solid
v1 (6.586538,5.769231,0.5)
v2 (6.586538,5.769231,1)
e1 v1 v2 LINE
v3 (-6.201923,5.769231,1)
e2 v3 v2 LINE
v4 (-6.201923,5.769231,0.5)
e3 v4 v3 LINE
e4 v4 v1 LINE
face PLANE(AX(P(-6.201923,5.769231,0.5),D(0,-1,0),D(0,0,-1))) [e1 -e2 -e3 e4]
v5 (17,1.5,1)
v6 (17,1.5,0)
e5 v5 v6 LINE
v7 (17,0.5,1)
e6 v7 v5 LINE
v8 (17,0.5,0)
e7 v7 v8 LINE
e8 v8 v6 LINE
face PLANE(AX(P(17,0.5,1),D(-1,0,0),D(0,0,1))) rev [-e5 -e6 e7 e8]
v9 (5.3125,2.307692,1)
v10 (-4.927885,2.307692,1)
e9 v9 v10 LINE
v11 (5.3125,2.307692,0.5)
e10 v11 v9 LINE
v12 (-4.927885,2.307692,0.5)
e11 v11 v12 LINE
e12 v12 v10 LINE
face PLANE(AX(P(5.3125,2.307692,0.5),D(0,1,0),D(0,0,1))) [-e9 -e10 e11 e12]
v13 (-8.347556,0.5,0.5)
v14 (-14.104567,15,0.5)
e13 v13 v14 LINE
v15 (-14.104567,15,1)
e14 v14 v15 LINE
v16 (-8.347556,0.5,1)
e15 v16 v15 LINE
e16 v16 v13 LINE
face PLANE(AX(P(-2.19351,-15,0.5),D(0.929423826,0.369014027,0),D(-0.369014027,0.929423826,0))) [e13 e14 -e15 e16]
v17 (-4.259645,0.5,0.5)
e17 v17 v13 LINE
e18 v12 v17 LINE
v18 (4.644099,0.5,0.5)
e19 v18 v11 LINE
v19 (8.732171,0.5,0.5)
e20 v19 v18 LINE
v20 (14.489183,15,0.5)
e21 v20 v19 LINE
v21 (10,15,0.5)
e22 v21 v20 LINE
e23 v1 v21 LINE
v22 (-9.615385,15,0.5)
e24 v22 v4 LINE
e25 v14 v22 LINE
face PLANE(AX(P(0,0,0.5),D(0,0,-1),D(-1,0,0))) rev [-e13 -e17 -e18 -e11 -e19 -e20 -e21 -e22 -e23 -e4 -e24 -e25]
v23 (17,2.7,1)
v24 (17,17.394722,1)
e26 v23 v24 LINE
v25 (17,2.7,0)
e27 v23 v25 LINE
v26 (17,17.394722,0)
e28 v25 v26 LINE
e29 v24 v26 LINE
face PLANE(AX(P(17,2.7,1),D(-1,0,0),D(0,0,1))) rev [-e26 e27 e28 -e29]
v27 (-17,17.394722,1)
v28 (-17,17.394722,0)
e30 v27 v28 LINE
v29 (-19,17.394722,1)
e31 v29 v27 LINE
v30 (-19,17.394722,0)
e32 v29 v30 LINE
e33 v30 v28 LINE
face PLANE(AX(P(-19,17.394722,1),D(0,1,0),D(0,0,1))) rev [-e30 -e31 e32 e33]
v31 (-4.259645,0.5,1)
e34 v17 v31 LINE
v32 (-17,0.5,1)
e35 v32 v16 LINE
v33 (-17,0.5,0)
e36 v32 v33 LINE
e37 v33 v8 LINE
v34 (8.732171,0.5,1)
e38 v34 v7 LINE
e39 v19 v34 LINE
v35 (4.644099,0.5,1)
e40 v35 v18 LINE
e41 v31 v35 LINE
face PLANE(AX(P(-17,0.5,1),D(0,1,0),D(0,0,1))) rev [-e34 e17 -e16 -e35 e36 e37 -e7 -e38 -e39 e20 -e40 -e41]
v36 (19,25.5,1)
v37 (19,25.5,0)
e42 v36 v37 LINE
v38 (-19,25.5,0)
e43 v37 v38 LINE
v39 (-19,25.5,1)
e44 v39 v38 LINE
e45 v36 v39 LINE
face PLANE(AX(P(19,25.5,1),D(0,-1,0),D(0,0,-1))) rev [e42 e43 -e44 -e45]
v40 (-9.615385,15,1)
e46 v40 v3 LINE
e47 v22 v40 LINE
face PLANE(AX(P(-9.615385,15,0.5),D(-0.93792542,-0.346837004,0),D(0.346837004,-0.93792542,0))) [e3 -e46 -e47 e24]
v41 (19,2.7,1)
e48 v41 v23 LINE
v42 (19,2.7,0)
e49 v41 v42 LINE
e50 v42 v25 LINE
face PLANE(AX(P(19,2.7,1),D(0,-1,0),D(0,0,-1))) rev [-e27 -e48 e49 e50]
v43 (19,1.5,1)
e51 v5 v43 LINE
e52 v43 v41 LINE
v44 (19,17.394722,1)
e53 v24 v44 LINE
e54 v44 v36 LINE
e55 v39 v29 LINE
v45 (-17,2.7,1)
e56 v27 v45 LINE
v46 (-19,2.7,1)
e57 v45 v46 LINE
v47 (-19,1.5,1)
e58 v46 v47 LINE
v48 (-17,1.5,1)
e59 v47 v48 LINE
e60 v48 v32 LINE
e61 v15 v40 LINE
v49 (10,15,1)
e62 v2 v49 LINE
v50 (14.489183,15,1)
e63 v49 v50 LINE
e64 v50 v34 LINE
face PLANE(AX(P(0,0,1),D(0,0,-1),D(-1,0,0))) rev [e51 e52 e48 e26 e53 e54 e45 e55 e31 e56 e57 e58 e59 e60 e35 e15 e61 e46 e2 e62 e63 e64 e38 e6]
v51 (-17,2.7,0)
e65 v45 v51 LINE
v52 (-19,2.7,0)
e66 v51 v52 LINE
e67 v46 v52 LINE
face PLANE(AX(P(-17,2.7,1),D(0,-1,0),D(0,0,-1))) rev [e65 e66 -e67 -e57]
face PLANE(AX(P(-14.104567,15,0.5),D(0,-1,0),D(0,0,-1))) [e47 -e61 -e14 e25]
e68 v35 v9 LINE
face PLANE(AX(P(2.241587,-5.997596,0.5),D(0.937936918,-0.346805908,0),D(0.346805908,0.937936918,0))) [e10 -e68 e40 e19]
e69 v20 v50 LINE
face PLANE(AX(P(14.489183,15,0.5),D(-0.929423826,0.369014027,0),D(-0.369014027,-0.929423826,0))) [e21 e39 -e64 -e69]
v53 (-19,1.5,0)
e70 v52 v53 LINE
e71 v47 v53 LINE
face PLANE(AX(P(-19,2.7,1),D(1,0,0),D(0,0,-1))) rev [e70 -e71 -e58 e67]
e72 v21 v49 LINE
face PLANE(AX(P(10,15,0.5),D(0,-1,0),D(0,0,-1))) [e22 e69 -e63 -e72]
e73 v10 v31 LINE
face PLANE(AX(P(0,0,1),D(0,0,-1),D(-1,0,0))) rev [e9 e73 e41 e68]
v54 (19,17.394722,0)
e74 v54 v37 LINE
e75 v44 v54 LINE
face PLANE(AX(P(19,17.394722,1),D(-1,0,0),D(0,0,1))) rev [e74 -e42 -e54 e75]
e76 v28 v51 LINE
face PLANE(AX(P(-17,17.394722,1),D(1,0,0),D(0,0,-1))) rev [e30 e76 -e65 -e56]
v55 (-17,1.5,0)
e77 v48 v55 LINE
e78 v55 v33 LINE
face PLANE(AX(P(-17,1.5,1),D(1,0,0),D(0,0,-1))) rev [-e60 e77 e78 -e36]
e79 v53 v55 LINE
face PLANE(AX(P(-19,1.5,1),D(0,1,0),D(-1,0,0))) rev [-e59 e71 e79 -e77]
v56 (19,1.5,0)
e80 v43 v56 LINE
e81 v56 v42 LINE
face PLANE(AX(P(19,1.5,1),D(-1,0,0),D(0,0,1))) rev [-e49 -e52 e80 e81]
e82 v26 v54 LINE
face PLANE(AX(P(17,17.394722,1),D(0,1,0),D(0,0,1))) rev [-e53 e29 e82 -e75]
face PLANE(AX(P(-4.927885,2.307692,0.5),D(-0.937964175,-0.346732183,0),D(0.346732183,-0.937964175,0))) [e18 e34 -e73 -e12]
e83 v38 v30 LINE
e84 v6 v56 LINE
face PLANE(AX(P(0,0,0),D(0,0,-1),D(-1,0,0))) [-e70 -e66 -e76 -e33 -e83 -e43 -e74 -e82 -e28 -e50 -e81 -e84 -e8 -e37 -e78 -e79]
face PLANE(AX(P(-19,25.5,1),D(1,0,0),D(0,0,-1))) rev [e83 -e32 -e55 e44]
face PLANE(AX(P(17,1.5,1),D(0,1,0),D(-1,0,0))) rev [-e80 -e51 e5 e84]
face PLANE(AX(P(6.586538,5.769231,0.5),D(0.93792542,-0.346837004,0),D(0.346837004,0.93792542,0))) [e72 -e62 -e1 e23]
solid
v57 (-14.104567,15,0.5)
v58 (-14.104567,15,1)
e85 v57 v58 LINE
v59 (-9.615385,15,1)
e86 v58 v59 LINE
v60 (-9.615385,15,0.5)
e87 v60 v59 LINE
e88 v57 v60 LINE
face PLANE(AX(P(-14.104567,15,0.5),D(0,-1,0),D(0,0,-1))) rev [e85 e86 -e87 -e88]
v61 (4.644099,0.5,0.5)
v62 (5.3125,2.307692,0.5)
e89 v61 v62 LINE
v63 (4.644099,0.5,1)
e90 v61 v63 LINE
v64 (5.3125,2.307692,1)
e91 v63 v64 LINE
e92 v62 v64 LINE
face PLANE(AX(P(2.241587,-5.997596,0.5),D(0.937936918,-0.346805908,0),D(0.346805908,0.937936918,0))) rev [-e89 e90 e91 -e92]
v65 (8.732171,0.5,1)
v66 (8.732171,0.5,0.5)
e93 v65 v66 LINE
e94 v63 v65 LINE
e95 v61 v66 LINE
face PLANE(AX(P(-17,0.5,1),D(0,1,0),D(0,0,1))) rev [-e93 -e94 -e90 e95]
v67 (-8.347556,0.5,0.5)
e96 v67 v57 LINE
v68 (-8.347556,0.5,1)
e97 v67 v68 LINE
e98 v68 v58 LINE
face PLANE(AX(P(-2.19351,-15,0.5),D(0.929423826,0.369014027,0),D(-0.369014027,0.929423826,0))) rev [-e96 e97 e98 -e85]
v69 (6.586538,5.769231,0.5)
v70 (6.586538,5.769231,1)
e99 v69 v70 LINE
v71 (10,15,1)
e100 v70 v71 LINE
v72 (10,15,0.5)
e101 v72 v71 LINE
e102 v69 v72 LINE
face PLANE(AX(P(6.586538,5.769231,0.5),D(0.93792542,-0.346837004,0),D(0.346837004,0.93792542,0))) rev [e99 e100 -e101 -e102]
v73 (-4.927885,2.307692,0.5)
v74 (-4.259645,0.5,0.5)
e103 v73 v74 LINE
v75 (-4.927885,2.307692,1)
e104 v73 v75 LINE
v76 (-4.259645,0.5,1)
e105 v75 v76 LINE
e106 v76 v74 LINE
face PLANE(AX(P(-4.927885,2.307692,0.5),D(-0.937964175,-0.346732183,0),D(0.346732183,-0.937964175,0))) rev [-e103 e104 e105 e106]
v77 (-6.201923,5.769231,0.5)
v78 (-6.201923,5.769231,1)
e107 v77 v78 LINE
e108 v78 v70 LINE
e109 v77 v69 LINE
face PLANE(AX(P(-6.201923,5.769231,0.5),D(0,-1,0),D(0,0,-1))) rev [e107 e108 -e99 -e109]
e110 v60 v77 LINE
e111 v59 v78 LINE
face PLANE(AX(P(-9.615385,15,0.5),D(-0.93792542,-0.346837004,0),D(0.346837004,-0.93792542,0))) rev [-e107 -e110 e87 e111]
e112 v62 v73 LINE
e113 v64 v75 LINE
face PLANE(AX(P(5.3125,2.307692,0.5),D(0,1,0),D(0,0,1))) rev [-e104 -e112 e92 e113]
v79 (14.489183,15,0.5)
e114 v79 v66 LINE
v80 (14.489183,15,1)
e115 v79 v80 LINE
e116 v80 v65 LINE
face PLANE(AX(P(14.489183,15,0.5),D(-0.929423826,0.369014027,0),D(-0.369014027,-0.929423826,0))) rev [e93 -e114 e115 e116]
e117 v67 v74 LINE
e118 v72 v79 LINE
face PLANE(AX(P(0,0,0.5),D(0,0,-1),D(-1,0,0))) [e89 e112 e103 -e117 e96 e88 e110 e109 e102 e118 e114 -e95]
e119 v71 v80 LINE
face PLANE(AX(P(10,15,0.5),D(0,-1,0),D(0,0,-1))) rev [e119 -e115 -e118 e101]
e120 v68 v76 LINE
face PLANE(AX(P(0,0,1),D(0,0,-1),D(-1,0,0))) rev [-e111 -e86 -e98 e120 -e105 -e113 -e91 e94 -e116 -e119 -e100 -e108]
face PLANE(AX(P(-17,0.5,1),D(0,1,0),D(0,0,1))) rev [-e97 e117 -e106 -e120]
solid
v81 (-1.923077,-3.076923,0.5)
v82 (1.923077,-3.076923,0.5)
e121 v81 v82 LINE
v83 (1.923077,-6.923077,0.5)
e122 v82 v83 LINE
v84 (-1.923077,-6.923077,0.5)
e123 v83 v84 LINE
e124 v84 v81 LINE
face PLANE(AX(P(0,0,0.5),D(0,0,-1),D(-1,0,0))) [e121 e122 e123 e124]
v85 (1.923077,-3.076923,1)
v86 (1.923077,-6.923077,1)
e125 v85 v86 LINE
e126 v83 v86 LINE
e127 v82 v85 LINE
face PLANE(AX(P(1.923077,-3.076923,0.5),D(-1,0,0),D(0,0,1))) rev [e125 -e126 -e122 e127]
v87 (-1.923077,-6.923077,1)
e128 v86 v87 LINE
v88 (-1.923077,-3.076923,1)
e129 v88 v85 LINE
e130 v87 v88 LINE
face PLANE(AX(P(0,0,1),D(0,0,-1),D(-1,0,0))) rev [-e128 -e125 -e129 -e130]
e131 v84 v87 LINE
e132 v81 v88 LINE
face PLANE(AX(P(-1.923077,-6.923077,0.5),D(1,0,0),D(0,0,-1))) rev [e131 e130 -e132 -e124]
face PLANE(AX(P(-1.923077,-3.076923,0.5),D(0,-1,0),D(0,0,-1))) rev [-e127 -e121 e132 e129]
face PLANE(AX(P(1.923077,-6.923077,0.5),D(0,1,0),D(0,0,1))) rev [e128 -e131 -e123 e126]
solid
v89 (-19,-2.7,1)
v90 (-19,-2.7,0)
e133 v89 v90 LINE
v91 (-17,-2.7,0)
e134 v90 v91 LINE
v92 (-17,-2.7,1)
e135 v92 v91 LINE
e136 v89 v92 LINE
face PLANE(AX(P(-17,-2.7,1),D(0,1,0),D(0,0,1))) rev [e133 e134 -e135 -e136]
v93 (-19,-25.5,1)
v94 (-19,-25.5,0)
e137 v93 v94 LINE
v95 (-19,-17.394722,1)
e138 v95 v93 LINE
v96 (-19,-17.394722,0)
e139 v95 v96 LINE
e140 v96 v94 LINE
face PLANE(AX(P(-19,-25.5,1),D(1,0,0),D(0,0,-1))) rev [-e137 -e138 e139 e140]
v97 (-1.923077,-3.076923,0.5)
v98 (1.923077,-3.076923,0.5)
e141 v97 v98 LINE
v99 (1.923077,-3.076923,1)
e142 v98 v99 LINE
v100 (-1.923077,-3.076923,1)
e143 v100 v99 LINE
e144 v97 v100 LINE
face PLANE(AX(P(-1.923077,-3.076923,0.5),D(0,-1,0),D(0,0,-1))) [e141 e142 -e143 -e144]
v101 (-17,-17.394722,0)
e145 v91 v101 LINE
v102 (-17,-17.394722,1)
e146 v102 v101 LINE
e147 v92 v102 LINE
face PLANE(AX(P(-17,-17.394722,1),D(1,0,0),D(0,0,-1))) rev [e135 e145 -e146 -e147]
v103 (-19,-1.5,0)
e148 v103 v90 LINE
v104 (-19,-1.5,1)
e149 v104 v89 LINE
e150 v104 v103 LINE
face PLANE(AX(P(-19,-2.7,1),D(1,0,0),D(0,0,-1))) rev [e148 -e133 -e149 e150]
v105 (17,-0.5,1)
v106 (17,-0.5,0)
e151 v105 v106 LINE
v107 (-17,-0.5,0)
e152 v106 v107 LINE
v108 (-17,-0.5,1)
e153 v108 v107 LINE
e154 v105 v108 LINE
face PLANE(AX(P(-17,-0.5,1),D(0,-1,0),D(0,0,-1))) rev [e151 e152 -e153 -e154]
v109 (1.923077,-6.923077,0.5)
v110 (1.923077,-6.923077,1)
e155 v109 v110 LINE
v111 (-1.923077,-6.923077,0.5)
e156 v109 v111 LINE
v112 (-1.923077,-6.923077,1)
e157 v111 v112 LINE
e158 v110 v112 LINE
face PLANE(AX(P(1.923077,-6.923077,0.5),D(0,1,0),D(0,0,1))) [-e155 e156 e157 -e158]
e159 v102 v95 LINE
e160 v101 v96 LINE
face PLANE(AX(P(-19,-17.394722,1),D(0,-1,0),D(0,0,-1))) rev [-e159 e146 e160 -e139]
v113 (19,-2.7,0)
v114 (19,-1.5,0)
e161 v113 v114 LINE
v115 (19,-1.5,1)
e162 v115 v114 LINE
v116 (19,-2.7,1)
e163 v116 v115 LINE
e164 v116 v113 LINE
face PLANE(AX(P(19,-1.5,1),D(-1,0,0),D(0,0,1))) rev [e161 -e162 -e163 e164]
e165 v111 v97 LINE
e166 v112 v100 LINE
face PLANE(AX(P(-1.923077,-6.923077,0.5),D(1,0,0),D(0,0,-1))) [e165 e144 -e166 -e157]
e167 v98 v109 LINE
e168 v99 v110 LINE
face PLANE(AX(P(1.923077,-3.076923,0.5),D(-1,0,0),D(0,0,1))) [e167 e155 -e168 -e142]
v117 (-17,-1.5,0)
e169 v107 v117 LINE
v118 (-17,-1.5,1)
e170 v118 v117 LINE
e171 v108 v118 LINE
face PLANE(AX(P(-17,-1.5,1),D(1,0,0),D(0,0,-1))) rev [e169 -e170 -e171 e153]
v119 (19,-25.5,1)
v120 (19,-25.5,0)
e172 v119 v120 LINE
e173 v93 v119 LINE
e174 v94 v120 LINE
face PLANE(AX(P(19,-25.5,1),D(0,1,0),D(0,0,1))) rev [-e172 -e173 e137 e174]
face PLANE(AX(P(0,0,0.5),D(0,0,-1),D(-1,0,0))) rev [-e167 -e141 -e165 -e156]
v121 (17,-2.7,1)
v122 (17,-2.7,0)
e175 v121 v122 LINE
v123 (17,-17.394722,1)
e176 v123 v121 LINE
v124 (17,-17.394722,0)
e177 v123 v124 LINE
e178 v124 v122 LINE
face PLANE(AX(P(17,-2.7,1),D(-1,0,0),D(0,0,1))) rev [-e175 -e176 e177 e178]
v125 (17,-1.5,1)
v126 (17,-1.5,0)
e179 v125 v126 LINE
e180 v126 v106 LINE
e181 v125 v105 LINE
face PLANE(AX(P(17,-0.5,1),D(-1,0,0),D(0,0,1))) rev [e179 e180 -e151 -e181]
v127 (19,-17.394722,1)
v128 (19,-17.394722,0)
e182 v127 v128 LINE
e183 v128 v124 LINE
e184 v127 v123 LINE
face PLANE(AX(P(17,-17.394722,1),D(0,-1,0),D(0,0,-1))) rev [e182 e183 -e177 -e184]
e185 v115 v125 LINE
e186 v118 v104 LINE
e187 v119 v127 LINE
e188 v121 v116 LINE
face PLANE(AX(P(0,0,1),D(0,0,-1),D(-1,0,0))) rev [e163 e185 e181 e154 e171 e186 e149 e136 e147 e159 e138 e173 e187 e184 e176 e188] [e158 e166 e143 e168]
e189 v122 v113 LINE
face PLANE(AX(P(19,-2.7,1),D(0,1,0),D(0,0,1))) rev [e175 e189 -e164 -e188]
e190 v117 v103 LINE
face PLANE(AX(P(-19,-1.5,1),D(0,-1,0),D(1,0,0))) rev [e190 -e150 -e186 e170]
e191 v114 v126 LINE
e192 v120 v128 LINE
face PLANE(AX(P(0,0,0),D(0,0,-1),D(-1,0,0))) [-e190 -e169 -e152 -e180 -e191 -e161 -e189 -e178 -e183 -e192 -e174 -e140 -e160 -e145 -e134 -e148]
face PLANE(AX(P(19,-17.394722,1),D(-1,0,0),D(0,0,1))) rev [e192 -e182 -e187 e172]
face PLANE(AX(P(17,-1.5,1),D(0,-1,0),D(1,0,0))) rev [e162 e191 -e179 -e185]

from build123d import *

# Parameters (mm, degrees)
FLIPS_DEPTH             = 1
FLIPS_2_DEPTH           = 1
NEXT_CUT_START          = 0.5
NEXT_CUT_DEPTH          = 0.5
NEXT_EXTRUDE_START      = 0.5
NEXT_EXTRUDE_DEPTH      = 0.5
PREV_CHAR_W             = 3.846153846
PREV_CHAR_H             = 3.846153846
PREV_CUT_DEPTH          = 0.5
PREV_CHAR_2_W           = 3.846153846
PREV_CHAR_2_H           = 3.846153846
PREV_EXTRUDE_DEPTH      = 0.5
PREV_EXTRUDE_2_DEPTH    = 0.5
CLEANUP_CUT2_DEPTH      = 32.815876543
CLEANUP_CUT2_DEPTH_BACK = 32.815876543
FRONT_CHAR_5_OUTSIDE_W  = 52.722
FRONT_CHAR_5_OUTSIDE_H  = 65.722


# Read off the part's stored shape, not the designer's step: Next_Cut, Next_Extrude
with BuildPart() as part:
    # Front_Char → Flips (new body)
    with BuildSketch(Plane.XY):
        Polygon((19, 1.5), (19, 2.7), (17, 2.7), (17, 17.394721707), (19, 17.394721707), (19, 25.5), (-19, 25.5), (-19, 17.394721707), (-17, 17.394721707), (-17, 2.7), (-19, 2.7), (-19, 1.5), (-17, 1.5), (-17, 0.5), (17, 0.5), (17, 1.5), align=None)
    extrude(amount=FLIPS_DEPTH)

    # Next_Cut outline → Next_Cut (cut)
    with BuildSketch(Plane.XY.offset(NEXT_CUT_START)):
        Polygon((8.732171474, 0.5), (14.489182692, 15), (10, 15), (6.586538462, 5.769230769), (-6.201923077, 5.769230769), (-9.615384615, 15), (-14.104567308, 15), (-8.34755609, 0.5), (-4.2596447, 0.5), (-4.927884615, 2.307692308), (5.3125, 2.307692308), (4.644098575, 0.5), align=None)
    extrude(amount=NEXT_CUT_DEPTH, mode=Mode.SUBTRACT)


with BuildPart() as body_2:
    # Front_Char → Flips 2 (new body)
    with BuildSketch(Plane.XY):
        Polygon((17, -0.5), (17, -1.5), (19, -1.5), (19, -2.7), (17, -2.7), (17, -17.394721707), (19, -17.394721707), (19, -25.5), (-19, -25.5), (-19, -17.394721707), (-17, -17.394721707), (-17, -2.7), (-19, -2.7), (-19, -1.5), (-17, -1.5), (-17, -0.5), align=None)
    extrude(amount=FLIPS_2_DEPTH)

    # Prev_Char → Prev_Cut (cut)
    with BuildSketch(Plane.XY.offset(1)):
        with Locations((0, -5)):
            Rectangle(PREV_CHAR_W, PREV_CHAR_H)
        with BuildLine():
            Line((1.923076923, 15), (1.923076923, 11.153846154))
            Line((1.923076923, 11.153846154), (-1.923076923, 11.153846154))
            Line((-1.923076923, 11.153846154), (-1.923076923, 15))
            add(Edge.make_bspline(
                [(-1.923076923, 15), (-1.914283477, 15.381050549), (-1.897511731, 16.107828482), (-1.760729141, 17.13971916), (-1.535383466, 18.056755761), (-1.21810162, 18.870165784), (-0.781937434, 19.577961225), (-0.245734256, 20.202360907), (0.404415871, 20.737461165), (0.900608511, 21.013146805), (1.153846154, 21.153846154)],
                knots=[0, 0, 0, 0, 1.252840278, 2.389542986, 3.415356866, 4.352460491, 5.24846073, 6.135967884, 7.048669687, 8, 8, 8, 8], degree=3))
            Line((1.153846154, 21.153846154), (1.923076923, 19.591346154))
            add(Edge.make_bspline(
                [(1.923076923, 19.591346154), (1.770942867, 19.496344705), (1.468198769, 19.307293492), (1.083033595, 18.931305848), (0.751943485, 18.50073585), (0.489822241, 17.994020356), (0.290655303, 17.397983725), (0.147350709, 16.699875597), (0.04372328, 15.888255652), (0.023043187, 15.308859313), (0.012019231, 15)],
                knots=[0, 0, 0, 0, 0.822197349, 1.636158272, 2.457375741, 3.30978844, 4.244349105, 5.336795784, 6.580323398, 8, 8, 8, 8], degree=3))
            Line((0.012019231, 15), (1.923076923, 15))
        make_face()
    extrude(amount=-PREV_CUT_DEPTH, mode=Mode.SUBTRACT)


with BuildPart() as body_3:
    # Next_Extrude outline → Next_Extrude (new body)
    with BuildSketch(Plane.XY.offset(NEXT_EXTRUDE_START)):
        Polygon((14.489182692, 15), (10, 15), (6.586538462, 5.769230769), (-6.201923077, 5.769230769), (-9.615384615, 15), (-14.104567308, 15), (-2.193509615, -15), (2.578125, -15), align=None)
        with BuildLine():
            add(Edge.make_bspline(
                [(0.192307692, -11.538461538), (0.307335645, -11.063663008), (0.538313239, -10.110261514), (1.015808404, -8.714356834), (1.570995037, -7.334346462), (2.016925505, -6.445433183), (2.241586538, -5.997596154)],
                knots=[0, 0, 0, 0, 0.247288569, 0.496558596, 0.746364794, 1, 1, 1, 1], degree=3))
            add(Edge.make_bspline(
                [(-2.013221154, -5.576923077), (-1.901483363, -5.88157387), (-1.683014884, -6.477223694), (-1.357212563, -7.342652605), (-1.059564813, -8.164499419), (-0.767696751, -8.930980031), (-0.504222239, -9.653228343), (-0.261371027, -10.326365893), (-0.021193229, -10.945714053), (0.122940847, -11.345876781), (0.192307692, -11.538461538)],
                knots=[0, 0, 0, 0, 0.153148109, 0.299433469, 0.436426351, 0.565670573, 0.68650831, 0.799268516, 0.903394741, 1, 1, 1, 1], degree=3))
            Line((-2.013221154, -5.576923077), (-4.927884615, 2.307692308))
            Line((-4.927884615, 2.307692308), (5.3125, 2.307692308))
            Line((5.3125, 2.307692308), (2.241586538, -5.997596154))
        make_face(mode=Mode.SUBTRACT)
    extrude(amount=NEXT_EXTRUDE_DEPTH)

    # Front_Char<5> outside → CleanUp_Cut2 (cut, two sides: drawn at the far end of the back side and taken through both)
    with BuildSketch(Plane.XY.offset(-CLEANUP_CUT2_DEPTH_BACK)):
        Rectangle(FRONT_CHAR_5_OUTSIDE_W, FRONT_CHAR_5_OUTSIDE_H)
        Polygon((19, 1.5), (19, 2.7), (17, 2.7), (17, 17.394721707), (19, 17.394721707), (19, 25.5), (-19, 25.5), (-19, 17.394721707), (-17, 17.394721707), (-17, 2.7), (-19, 2.7), (-19, 1.5), (-17, 1.5), (-17, 0.5), (17, 0.5), (17, 1.5), align=None, mode=Mode.SUBTRACT)
        Polygon((17, -0.5), (17, -1.5), (19, -1.5), (19, -2.7), (17, -2.7), (17, -17.394721707), (19, -17.394721707), (19, -25.5), (-19, -25.5), (-19, -17.394721707), (-17, -17.394721707), (-17, -2.7), (-19, -2.7), (-19, -1.5), (-17, -1.5), (-17, -0.5), align=None, mode=Mode.SUBTRACT)
    extrude(amount=CLEANUP_CUT2_DEPTH + CLEANUP_CUT2_DEPTH_BACK, mode=Mode.SUBTRACT)


with BuildPart() as body_4:
    # Prev_Char<2> → Prev_Extrude (new body)
    with BuildSketch(Plane.XY.offset(1)):
        with Locations((0, -5)):
            Rectangle(PREV_CHAR_2_W, PREV_CHAR_2_H)
    extrude(amount=-PREV_EXTRUDE_DEPTH)


with BuildPart() as body_5:
    # Prev_Char<2> → Prev_Extrude 2 (new body)
    with BuildSketch(Plane.XY.offset(1)):
        with BuildLine():
            Line((1.923076923, 15), (1.923076923, 11.153846154))
            Line((1.923076923, 11.153846154), (-1.923076923, 11.153846154))
            Line((-1.923076923, 11.153846154), (-1.923076923, 15))
            add(Edge.make_bspline(
                [(-1.923076923, 15), (-1.914283477, 15.381050549), (-1.897511731, 16.107828482), (-1.760729141, 17.13971916), (-1.535383466, 18.056755761), (-1.21810162, 18.870165784), (-0.781937434, 19.577961225), (-0.245734256, 20.202360907), (0.404415871, 20.737461165), (0.900608511, 21.013146805), (1.153846154, 21.153846154)],
                knots=[0, 0, 0, 0, 1.252840278, 2.389542986, 3.415356866, 4.352460491, 5.24846073, 6.135967884, 7.048669687, 8, 8, 8, 8], degree=3))
            Line((1.153846154, 21.153846154), (1.923076923, 19.591346154))
            add(Edge.make_bspline(
                [(1.923076923, 19.591346154), (1.770942867, 19.496344705), (1.468198769, 19.307293492), (1.083033595, 18.931305848), (0.751943485, 18.50073585), (0.489822241, 17.994020356), (0.290655303, 17.397983725), (0.147350709, 16.699875597), (0.04372328, 15.888255652), (0.023043187, 15.308859313), (0.012019231, 15)],
                knots=[0, 0, 0, 0, 0.822197349, 1.636158272, 2.457375741, 3.30978844, 4.244349105, 5.336795784, 6.580323398, 8, 8, 8, 8], degree=3))
            Line((0.012019231, 15), (1.923076923, 15))
        make_face()
    extrude(amount=-PREV_EXTRUDE_2_DEPTH)


with BuildPart() as cleanup_cut2_piece_1:
    # of the separate pieces the step leaves, piece 1, a body of its own (cleanup_cut2_pieces)
    add(body_3.part.solids().sort_by_distance((14.489182692, 15, 0.5))[0])


with BuildPart() as cleanup_cut2_piece_2:
    # of the separate pieces the step leaves, piece 2, a body of its own (cleanup_cut2_pieces)
    add(body_3.part.solids().sort_by_distance((2.578125, -15, 0.5))[0])


solid = Compound([part.part, body_2.part, body_4.part, cleanup_cut2_piece_1.part])
